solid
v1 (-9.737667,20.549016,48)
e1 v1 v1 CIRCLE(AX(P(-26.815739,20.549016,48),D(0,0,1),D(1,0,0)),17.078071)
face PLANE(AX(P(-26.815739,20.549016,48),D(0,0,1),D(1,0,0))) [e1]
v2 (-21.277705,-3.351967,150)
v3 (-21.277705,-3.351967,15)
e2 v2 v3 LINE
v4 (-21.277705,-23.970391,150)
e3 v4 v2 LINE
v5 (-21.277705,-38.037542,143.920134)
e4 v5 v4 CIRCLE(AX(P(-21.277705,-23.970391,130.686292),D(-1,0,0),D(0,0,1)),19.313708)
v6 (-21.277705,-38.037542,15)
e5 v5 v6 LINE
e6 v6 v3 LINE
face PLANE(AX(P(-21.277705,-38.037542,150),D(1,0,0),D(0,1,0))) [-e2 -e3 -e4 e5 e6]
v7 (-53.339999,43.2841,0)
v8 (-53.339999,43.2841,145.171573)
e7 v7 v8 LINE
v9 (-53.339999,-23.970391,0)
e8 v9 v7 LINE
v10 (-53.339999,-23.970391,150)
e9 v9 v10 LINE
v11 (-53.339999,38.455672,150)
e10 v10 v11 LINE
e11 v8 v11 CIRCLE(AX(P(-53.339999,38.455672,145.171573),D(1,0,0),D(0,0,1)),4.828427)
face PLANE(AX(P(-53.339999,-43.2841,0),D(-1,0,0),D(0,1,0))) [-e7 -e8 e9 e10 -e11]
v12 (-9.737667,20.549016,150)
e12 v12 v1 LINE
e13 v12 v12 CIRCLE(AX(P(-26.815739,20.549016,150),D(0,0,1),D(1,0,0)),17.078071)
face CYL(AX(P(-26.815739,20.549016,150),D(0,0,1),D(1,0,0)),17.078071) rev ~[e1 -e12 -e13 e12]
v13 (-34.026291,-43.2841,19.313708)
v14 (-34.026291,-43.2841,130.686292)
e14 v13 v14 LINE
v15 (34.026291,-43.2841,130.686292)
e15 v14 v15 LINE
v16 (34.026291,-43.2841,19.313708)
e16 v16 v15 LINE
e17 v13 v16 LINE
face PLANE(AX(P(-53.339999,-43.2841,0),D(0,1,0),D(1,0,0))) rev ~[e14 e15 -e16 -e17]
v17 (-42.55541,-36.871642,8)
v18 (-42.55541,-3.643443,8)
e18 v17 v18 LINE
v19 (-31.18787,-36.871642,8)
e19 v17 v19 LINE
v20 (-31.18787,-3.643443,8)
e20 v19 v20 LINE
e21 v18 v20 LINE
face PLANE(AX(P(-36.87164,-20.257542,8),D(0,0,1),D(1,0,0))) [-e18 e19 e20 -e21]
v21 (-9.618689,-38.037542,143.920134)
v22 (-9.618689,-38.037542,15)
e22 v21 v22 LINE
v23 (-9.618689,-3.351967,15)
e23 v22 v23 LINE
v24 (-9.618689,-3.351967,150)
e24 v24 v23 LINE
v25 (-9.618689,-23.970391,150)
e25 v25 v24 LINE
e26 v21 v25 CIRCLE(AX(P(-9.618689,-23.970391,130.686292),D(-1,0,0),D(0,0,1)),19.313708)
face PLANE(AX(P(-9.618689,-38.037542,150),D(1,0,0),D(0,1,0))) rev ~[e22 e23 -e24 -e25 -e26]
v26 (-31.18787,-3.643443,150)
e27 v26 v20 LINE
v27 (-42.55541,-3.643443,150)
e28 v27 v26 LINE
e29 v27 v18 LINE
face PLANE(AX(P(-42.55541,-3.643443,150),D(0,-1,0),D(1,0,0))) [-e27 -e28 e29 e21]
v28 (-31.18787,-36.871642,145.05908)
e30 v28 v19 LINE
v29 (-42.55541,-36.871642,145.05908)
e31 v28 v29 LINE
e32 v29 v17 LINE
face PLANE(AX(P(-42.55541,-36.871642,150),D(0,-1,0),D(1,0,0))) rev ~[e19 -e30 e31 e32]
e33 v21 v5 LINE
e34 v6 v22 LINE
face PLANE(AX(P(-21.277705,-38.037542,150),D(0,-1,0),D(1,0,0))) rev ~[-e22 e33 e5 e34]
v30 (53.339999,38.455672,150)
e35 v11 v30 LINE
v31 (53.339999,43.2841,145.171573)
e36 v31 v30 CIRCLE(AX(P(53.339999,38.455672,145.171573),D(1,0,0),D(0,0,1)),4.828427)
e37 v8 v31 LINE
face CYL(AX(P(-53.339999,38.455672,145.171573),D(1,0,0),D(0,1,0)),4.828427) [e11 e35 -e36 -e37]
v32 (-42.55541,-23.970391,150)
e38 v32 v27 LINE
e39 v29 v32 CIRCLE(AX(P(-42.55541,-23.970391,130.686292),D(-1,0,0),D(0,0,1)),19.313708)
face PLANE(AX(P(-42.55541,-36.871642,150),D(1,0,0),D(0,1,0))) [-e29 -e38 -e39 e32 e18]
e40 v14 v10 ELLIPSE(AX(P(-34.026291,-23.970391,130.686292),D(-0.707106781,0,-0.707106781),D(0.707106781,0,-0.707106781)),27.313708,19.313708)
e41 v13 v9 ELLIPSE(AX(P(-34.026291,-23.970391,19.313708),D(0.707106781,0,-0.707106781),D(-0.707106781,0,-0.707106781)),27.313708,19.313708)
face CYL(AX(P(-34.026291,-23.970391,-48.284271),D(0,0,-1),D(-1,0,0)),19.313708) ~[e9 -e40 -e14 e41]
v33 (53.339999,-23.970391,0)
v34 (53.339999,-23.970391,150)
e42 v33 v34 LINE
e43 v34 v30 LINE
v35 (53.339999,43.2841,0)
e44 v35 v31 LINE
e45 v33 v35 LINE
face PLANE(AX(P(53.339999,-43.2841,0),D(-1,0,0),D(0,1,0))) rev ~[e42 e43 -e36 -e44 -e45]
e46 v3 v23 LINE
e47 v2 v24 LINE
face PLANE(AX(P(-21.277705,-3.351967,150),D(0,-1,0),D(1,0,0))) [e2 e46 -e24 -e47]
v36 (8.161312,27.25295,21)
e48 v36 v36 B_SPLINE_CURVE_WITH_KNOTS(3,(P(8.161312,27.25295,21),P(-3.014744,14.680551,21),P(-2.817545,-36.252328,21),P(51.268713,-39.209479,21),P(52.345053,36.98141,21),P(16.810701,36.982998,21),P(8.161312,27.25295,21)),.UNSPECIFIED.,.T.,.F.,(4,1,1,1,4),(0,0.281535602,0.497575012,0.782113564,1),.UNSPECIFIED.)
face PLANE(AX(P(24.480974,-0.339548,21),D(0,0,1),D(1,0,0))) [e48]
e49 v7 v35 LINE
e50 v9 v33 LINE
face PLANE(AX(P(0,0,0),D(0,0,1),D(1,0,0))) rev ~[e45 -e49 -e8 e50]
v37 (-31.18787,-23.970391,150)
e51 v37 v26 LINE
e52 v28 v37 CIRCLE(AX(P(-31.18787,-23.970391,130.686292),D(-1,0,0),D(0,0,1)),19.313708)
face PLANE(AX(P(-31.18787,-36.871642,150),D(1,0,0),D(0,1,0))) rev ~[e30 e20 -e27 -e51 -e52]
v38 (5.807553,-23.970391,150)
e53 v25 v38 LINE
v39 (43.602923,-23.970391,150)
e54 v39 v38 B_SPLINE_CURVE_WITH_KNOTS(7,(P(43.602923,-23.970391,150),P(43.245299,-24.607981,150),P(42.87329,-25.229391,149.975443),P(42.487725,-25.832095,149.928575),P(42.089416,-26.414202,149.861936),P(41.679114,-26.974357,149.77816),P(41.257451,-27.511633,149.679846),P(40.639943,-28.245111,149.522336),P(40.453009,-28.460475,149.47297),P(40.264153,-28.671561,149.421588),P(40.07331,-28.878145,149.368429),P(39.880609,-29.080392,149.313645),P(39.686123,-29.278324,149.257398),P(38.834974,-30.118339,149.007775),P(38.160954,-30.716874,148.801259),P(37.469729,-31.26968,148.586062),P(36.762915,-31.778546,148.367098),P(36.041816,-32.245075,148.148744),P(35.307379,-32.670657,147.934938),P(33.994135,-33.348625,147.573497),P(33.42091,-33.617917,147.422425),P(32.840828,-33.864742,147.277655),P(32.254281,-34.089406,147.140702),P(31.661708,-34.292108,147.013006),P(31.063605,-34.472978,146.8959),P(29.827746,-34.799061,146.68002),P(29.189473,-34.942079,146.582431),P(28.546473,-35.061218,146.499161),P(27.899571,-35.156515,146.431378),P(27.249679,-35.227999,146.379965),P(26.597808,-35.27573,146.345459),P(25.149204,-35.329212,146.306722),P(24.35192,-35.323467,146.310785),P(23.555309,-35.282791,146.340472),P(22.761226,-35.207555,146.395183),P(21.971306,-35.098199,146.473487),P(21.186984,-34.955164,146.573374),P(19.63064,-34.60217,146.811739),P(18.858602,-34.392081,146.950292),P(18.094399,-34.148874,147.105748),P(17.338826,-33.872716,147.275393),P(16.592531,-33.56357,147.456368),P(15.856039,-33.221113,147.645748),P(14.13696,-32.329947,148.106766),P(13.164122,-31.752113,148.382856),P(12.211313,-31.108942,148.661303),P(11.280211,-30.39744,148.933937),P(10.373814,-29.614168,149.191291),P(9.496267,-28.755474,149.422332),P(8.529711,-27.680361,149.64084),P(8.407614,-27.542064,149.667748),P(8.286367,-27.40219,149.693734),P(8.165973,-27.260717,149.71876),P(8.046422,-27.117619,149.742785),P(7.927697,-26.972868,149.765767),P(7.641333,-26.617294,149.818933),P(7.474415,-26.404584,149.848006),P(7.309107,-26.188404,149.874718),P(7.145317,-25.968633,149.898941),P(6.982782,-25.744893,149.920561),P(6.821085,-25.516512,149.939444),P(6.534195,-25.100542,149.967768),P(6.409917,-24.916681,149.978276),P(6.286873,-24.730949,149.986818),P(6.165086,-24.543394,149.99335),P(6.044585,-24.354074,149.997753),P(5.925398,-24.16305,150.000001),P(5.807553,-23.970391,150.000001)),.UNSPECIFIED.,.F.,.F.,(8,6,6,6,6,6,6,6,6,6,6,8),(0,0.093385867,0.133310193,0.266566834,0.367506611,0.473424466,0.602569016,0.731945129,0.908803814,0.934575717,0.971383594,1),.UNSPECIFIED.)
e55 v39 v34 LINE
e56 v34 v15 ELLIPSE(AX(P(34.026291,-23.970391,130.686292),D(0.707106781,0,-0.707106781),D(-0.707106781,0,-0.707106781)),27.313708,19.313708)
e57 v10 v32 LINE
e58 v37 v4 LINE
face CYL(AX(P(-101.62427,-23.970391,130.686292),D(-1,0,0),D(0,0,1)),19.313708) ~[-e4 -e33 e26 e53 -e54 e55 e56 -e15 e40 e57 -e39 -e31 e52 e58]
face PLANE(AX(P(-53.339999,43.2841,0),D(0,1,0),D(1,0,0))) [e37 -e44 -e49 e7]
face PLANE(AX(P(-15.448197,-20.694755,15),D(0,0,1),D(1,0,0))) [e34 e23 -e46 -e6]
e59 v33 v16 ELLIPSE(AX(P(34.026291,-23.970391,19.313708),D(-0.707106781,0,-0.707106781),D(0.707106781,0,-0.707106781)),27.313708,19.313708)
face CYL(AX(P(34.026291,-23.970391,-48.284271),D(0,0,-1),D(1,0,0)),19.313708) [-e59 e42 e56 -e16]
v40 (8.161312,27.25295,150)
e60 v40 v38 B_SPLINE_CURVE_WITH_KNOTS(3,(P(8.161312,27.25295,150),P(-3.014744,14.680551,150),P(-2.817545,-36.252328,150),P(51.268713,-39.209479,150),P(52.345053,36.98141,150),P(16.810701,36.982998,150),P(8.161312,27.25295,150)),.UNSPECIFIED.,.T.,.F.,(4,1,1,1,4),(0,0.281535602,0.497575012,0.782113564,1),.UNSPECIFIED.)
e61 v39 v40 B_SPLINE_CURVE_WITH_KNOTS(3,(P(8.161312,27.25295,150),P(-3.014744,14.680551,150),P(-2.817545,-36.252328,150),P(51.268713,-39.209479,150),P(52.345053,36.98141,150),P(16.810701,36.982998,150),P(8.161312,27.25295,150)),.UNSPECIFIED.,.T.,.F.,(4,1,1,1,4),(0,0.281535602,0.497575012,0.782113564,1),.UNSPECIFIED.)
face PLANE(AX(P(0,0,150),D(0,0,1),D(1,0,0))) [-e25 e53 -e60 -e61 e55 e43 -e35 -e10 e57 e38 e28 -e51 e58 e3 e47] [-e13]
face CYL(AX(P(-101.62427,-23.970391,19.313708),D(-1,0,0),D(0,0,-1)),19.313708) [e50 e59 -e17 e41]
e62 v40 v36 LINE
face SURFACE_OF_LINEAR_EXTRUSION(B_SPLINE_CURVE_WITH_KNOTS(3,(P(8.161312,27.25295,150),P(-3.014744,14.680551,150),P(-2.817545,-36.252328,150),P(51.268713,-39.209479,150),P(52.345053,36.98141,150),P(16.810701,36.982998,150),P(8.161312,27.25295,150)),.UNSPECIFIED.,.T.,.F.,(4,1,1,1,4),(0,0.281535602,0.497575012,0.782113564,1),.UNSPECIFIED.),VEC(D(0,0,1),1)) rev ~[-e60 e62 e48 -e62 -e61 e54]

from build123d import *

# Parameters (mm, degrees)
F0_W         = 106.6799983382
F0_H         = 86.5681990981
F1_DEPTH     = 150
F6_DEPTH     = 129
F2_R         = 17.0780712093
F7_DEPTH     = 102
F5_W         = 11.6590159014
F5_H         = 34.6855749376
F8_DEPTH     = 135
F4_W         = 11.3675408065
F4_H         = 33.2281992305
F9_DEPTH     = 142
F10_T1_DEPTH = 246.5685424949
F10_T3_DEPTH = 203.2485408331
F11_R        = 4.8284271247


# Not quite as in the source:
# - a fillet or chamfer that OpenCascade refuses, or shapes differently, is made with other operations: its cross-section is extruded or revolved along the edge and cut away or added


with BuildPart() as f1:
    # F0 (on Top) → F1 (new body)
    with BuildSketch(Plane.XY):
        Rectangle(F0_W, F0_H)
    extrude(amount=F1_DEPTH)

    # F3 (on face) → F6 (cut)
    with BuildSketch(Plane.XY.offset(150)):
        with BuildLine():
            add(Edge.make_bspline(
                [(8.1613119692, 27.2529497743), (-3.0147443048, 14.6805512394), (-2.8175450086, -36.252327606), (51.2687127956, -39.2094789539), (52.3450533609, 36.9814095435), (16.8107014154, 36.9829984189), (8.1613119692, 27.2529497743)],
                knots=[0, 0, 0, 0, 0.2815356024, 0.4975750124, 0.7821135642, 1, 1, 1, 1], degree=3))
        make_face()
    extrude(amount=-F6_DEPTH, mode=Mode.SUBTRACT)

    # F2 (on face) → F7 (cut)
    with BuildSketch(Plane.XY.offset(150)):
        with Locations((-26.815738529, 20.5490160733)):
            Circle(F2_R)
    extrude(amount=-F7_DEPTH, mode=Mode.SUBTRACT)

    # F5 (on face) → F8 (cut)
    with BuildSketch(Plane.XY.offset(150)):
        with Locations((-15.4481972568, -20.6947547849)):
            Rectangle(F5_W, F5_H)
    extrude(amount=-F8_DEPTH, mode=Mode.SUBTRACT)

    # F4 (on face) → F9 (cut)
    with BuildSketch(Plane.XY.offset(150)):
        with Locations((-36.8716400117, -20.2575422591)):
            Rectangle(F4_W, F4_H)
    extrude(amount=-F9_DEPTH, mode=Mode.SUBTRACT)

    # F10: fillet of radius 19.313708499 on 4 edges, made by hand

    # F10_s2 → F10_t1 (cut)
    with BuildSketch(Plane.XY.offset(-48.2842712475)):
        with BuildLine():
            ThreePointArc((-53.3399991691, -23.9703910501), (-47.6831449196, -37.6272452996), (-34.0262906701, -43.2840995491))
            Line((-34.0262906701, -43.2840995491), (-53.3399991691, -43.2840995491))
            Line((-53.3399991691, -43.2840995491), (-53.3399991691, -23.9703910501))
        make_face()
        with BuildLine():
            ThreePointArc((53.3399991691, -23.9703910501), (47.6831449196, -37.6272452996), (34.0262906701, -43.2840995491))
            Line((34.0262906701, -43.2840995491), (53.3399991691, -43.2840995491))
            Line((53.3399991691, -43.2840995491), (53.3399991691, -23.9703910501))
        make_face()
    extrude(amount=F10_T1_DEPTH, mode=Mode.SUBTRACT)

    # F10_s4 → F10_t3 (cut)
    with BuildSketch(Plane.YZ.offset(-101.6242704166)):
        with BuildLine():
            ThreePointArc((-23.9703910501, 0), (-37.6272452996, 5.6568542495), (-43.2840995491, 19.313708499))
            Line((-43.2840995491, 19.313708499), (-43.2840995491, 0))
            Line((-43.2840995491, 0), (-23.9703910501, 0))
        make_face()
        with BuildLine():
            ThreePointArc((-23.9703910501, 150), (-37.6272452996, 144.3431457505), (-43.2840995491, 130.686291501))
            Line((-43.2840995491, 130.686291501), (-43.2840995491, 150))
            Line((-43.2840995491, 150), (-23.9703910501, 150))
        make_face()
    extrude(amount=F10_T3_DEPTH, mode=Mode.SUBTRACT)

    # F11
    f11_edges = [f1.edges().sort_by_distance(p)[0] for p in [
        (0, 43.2841, 150),
    ]]
    fillet(f11_edges, radius=F11_R)


solid = f1.part
